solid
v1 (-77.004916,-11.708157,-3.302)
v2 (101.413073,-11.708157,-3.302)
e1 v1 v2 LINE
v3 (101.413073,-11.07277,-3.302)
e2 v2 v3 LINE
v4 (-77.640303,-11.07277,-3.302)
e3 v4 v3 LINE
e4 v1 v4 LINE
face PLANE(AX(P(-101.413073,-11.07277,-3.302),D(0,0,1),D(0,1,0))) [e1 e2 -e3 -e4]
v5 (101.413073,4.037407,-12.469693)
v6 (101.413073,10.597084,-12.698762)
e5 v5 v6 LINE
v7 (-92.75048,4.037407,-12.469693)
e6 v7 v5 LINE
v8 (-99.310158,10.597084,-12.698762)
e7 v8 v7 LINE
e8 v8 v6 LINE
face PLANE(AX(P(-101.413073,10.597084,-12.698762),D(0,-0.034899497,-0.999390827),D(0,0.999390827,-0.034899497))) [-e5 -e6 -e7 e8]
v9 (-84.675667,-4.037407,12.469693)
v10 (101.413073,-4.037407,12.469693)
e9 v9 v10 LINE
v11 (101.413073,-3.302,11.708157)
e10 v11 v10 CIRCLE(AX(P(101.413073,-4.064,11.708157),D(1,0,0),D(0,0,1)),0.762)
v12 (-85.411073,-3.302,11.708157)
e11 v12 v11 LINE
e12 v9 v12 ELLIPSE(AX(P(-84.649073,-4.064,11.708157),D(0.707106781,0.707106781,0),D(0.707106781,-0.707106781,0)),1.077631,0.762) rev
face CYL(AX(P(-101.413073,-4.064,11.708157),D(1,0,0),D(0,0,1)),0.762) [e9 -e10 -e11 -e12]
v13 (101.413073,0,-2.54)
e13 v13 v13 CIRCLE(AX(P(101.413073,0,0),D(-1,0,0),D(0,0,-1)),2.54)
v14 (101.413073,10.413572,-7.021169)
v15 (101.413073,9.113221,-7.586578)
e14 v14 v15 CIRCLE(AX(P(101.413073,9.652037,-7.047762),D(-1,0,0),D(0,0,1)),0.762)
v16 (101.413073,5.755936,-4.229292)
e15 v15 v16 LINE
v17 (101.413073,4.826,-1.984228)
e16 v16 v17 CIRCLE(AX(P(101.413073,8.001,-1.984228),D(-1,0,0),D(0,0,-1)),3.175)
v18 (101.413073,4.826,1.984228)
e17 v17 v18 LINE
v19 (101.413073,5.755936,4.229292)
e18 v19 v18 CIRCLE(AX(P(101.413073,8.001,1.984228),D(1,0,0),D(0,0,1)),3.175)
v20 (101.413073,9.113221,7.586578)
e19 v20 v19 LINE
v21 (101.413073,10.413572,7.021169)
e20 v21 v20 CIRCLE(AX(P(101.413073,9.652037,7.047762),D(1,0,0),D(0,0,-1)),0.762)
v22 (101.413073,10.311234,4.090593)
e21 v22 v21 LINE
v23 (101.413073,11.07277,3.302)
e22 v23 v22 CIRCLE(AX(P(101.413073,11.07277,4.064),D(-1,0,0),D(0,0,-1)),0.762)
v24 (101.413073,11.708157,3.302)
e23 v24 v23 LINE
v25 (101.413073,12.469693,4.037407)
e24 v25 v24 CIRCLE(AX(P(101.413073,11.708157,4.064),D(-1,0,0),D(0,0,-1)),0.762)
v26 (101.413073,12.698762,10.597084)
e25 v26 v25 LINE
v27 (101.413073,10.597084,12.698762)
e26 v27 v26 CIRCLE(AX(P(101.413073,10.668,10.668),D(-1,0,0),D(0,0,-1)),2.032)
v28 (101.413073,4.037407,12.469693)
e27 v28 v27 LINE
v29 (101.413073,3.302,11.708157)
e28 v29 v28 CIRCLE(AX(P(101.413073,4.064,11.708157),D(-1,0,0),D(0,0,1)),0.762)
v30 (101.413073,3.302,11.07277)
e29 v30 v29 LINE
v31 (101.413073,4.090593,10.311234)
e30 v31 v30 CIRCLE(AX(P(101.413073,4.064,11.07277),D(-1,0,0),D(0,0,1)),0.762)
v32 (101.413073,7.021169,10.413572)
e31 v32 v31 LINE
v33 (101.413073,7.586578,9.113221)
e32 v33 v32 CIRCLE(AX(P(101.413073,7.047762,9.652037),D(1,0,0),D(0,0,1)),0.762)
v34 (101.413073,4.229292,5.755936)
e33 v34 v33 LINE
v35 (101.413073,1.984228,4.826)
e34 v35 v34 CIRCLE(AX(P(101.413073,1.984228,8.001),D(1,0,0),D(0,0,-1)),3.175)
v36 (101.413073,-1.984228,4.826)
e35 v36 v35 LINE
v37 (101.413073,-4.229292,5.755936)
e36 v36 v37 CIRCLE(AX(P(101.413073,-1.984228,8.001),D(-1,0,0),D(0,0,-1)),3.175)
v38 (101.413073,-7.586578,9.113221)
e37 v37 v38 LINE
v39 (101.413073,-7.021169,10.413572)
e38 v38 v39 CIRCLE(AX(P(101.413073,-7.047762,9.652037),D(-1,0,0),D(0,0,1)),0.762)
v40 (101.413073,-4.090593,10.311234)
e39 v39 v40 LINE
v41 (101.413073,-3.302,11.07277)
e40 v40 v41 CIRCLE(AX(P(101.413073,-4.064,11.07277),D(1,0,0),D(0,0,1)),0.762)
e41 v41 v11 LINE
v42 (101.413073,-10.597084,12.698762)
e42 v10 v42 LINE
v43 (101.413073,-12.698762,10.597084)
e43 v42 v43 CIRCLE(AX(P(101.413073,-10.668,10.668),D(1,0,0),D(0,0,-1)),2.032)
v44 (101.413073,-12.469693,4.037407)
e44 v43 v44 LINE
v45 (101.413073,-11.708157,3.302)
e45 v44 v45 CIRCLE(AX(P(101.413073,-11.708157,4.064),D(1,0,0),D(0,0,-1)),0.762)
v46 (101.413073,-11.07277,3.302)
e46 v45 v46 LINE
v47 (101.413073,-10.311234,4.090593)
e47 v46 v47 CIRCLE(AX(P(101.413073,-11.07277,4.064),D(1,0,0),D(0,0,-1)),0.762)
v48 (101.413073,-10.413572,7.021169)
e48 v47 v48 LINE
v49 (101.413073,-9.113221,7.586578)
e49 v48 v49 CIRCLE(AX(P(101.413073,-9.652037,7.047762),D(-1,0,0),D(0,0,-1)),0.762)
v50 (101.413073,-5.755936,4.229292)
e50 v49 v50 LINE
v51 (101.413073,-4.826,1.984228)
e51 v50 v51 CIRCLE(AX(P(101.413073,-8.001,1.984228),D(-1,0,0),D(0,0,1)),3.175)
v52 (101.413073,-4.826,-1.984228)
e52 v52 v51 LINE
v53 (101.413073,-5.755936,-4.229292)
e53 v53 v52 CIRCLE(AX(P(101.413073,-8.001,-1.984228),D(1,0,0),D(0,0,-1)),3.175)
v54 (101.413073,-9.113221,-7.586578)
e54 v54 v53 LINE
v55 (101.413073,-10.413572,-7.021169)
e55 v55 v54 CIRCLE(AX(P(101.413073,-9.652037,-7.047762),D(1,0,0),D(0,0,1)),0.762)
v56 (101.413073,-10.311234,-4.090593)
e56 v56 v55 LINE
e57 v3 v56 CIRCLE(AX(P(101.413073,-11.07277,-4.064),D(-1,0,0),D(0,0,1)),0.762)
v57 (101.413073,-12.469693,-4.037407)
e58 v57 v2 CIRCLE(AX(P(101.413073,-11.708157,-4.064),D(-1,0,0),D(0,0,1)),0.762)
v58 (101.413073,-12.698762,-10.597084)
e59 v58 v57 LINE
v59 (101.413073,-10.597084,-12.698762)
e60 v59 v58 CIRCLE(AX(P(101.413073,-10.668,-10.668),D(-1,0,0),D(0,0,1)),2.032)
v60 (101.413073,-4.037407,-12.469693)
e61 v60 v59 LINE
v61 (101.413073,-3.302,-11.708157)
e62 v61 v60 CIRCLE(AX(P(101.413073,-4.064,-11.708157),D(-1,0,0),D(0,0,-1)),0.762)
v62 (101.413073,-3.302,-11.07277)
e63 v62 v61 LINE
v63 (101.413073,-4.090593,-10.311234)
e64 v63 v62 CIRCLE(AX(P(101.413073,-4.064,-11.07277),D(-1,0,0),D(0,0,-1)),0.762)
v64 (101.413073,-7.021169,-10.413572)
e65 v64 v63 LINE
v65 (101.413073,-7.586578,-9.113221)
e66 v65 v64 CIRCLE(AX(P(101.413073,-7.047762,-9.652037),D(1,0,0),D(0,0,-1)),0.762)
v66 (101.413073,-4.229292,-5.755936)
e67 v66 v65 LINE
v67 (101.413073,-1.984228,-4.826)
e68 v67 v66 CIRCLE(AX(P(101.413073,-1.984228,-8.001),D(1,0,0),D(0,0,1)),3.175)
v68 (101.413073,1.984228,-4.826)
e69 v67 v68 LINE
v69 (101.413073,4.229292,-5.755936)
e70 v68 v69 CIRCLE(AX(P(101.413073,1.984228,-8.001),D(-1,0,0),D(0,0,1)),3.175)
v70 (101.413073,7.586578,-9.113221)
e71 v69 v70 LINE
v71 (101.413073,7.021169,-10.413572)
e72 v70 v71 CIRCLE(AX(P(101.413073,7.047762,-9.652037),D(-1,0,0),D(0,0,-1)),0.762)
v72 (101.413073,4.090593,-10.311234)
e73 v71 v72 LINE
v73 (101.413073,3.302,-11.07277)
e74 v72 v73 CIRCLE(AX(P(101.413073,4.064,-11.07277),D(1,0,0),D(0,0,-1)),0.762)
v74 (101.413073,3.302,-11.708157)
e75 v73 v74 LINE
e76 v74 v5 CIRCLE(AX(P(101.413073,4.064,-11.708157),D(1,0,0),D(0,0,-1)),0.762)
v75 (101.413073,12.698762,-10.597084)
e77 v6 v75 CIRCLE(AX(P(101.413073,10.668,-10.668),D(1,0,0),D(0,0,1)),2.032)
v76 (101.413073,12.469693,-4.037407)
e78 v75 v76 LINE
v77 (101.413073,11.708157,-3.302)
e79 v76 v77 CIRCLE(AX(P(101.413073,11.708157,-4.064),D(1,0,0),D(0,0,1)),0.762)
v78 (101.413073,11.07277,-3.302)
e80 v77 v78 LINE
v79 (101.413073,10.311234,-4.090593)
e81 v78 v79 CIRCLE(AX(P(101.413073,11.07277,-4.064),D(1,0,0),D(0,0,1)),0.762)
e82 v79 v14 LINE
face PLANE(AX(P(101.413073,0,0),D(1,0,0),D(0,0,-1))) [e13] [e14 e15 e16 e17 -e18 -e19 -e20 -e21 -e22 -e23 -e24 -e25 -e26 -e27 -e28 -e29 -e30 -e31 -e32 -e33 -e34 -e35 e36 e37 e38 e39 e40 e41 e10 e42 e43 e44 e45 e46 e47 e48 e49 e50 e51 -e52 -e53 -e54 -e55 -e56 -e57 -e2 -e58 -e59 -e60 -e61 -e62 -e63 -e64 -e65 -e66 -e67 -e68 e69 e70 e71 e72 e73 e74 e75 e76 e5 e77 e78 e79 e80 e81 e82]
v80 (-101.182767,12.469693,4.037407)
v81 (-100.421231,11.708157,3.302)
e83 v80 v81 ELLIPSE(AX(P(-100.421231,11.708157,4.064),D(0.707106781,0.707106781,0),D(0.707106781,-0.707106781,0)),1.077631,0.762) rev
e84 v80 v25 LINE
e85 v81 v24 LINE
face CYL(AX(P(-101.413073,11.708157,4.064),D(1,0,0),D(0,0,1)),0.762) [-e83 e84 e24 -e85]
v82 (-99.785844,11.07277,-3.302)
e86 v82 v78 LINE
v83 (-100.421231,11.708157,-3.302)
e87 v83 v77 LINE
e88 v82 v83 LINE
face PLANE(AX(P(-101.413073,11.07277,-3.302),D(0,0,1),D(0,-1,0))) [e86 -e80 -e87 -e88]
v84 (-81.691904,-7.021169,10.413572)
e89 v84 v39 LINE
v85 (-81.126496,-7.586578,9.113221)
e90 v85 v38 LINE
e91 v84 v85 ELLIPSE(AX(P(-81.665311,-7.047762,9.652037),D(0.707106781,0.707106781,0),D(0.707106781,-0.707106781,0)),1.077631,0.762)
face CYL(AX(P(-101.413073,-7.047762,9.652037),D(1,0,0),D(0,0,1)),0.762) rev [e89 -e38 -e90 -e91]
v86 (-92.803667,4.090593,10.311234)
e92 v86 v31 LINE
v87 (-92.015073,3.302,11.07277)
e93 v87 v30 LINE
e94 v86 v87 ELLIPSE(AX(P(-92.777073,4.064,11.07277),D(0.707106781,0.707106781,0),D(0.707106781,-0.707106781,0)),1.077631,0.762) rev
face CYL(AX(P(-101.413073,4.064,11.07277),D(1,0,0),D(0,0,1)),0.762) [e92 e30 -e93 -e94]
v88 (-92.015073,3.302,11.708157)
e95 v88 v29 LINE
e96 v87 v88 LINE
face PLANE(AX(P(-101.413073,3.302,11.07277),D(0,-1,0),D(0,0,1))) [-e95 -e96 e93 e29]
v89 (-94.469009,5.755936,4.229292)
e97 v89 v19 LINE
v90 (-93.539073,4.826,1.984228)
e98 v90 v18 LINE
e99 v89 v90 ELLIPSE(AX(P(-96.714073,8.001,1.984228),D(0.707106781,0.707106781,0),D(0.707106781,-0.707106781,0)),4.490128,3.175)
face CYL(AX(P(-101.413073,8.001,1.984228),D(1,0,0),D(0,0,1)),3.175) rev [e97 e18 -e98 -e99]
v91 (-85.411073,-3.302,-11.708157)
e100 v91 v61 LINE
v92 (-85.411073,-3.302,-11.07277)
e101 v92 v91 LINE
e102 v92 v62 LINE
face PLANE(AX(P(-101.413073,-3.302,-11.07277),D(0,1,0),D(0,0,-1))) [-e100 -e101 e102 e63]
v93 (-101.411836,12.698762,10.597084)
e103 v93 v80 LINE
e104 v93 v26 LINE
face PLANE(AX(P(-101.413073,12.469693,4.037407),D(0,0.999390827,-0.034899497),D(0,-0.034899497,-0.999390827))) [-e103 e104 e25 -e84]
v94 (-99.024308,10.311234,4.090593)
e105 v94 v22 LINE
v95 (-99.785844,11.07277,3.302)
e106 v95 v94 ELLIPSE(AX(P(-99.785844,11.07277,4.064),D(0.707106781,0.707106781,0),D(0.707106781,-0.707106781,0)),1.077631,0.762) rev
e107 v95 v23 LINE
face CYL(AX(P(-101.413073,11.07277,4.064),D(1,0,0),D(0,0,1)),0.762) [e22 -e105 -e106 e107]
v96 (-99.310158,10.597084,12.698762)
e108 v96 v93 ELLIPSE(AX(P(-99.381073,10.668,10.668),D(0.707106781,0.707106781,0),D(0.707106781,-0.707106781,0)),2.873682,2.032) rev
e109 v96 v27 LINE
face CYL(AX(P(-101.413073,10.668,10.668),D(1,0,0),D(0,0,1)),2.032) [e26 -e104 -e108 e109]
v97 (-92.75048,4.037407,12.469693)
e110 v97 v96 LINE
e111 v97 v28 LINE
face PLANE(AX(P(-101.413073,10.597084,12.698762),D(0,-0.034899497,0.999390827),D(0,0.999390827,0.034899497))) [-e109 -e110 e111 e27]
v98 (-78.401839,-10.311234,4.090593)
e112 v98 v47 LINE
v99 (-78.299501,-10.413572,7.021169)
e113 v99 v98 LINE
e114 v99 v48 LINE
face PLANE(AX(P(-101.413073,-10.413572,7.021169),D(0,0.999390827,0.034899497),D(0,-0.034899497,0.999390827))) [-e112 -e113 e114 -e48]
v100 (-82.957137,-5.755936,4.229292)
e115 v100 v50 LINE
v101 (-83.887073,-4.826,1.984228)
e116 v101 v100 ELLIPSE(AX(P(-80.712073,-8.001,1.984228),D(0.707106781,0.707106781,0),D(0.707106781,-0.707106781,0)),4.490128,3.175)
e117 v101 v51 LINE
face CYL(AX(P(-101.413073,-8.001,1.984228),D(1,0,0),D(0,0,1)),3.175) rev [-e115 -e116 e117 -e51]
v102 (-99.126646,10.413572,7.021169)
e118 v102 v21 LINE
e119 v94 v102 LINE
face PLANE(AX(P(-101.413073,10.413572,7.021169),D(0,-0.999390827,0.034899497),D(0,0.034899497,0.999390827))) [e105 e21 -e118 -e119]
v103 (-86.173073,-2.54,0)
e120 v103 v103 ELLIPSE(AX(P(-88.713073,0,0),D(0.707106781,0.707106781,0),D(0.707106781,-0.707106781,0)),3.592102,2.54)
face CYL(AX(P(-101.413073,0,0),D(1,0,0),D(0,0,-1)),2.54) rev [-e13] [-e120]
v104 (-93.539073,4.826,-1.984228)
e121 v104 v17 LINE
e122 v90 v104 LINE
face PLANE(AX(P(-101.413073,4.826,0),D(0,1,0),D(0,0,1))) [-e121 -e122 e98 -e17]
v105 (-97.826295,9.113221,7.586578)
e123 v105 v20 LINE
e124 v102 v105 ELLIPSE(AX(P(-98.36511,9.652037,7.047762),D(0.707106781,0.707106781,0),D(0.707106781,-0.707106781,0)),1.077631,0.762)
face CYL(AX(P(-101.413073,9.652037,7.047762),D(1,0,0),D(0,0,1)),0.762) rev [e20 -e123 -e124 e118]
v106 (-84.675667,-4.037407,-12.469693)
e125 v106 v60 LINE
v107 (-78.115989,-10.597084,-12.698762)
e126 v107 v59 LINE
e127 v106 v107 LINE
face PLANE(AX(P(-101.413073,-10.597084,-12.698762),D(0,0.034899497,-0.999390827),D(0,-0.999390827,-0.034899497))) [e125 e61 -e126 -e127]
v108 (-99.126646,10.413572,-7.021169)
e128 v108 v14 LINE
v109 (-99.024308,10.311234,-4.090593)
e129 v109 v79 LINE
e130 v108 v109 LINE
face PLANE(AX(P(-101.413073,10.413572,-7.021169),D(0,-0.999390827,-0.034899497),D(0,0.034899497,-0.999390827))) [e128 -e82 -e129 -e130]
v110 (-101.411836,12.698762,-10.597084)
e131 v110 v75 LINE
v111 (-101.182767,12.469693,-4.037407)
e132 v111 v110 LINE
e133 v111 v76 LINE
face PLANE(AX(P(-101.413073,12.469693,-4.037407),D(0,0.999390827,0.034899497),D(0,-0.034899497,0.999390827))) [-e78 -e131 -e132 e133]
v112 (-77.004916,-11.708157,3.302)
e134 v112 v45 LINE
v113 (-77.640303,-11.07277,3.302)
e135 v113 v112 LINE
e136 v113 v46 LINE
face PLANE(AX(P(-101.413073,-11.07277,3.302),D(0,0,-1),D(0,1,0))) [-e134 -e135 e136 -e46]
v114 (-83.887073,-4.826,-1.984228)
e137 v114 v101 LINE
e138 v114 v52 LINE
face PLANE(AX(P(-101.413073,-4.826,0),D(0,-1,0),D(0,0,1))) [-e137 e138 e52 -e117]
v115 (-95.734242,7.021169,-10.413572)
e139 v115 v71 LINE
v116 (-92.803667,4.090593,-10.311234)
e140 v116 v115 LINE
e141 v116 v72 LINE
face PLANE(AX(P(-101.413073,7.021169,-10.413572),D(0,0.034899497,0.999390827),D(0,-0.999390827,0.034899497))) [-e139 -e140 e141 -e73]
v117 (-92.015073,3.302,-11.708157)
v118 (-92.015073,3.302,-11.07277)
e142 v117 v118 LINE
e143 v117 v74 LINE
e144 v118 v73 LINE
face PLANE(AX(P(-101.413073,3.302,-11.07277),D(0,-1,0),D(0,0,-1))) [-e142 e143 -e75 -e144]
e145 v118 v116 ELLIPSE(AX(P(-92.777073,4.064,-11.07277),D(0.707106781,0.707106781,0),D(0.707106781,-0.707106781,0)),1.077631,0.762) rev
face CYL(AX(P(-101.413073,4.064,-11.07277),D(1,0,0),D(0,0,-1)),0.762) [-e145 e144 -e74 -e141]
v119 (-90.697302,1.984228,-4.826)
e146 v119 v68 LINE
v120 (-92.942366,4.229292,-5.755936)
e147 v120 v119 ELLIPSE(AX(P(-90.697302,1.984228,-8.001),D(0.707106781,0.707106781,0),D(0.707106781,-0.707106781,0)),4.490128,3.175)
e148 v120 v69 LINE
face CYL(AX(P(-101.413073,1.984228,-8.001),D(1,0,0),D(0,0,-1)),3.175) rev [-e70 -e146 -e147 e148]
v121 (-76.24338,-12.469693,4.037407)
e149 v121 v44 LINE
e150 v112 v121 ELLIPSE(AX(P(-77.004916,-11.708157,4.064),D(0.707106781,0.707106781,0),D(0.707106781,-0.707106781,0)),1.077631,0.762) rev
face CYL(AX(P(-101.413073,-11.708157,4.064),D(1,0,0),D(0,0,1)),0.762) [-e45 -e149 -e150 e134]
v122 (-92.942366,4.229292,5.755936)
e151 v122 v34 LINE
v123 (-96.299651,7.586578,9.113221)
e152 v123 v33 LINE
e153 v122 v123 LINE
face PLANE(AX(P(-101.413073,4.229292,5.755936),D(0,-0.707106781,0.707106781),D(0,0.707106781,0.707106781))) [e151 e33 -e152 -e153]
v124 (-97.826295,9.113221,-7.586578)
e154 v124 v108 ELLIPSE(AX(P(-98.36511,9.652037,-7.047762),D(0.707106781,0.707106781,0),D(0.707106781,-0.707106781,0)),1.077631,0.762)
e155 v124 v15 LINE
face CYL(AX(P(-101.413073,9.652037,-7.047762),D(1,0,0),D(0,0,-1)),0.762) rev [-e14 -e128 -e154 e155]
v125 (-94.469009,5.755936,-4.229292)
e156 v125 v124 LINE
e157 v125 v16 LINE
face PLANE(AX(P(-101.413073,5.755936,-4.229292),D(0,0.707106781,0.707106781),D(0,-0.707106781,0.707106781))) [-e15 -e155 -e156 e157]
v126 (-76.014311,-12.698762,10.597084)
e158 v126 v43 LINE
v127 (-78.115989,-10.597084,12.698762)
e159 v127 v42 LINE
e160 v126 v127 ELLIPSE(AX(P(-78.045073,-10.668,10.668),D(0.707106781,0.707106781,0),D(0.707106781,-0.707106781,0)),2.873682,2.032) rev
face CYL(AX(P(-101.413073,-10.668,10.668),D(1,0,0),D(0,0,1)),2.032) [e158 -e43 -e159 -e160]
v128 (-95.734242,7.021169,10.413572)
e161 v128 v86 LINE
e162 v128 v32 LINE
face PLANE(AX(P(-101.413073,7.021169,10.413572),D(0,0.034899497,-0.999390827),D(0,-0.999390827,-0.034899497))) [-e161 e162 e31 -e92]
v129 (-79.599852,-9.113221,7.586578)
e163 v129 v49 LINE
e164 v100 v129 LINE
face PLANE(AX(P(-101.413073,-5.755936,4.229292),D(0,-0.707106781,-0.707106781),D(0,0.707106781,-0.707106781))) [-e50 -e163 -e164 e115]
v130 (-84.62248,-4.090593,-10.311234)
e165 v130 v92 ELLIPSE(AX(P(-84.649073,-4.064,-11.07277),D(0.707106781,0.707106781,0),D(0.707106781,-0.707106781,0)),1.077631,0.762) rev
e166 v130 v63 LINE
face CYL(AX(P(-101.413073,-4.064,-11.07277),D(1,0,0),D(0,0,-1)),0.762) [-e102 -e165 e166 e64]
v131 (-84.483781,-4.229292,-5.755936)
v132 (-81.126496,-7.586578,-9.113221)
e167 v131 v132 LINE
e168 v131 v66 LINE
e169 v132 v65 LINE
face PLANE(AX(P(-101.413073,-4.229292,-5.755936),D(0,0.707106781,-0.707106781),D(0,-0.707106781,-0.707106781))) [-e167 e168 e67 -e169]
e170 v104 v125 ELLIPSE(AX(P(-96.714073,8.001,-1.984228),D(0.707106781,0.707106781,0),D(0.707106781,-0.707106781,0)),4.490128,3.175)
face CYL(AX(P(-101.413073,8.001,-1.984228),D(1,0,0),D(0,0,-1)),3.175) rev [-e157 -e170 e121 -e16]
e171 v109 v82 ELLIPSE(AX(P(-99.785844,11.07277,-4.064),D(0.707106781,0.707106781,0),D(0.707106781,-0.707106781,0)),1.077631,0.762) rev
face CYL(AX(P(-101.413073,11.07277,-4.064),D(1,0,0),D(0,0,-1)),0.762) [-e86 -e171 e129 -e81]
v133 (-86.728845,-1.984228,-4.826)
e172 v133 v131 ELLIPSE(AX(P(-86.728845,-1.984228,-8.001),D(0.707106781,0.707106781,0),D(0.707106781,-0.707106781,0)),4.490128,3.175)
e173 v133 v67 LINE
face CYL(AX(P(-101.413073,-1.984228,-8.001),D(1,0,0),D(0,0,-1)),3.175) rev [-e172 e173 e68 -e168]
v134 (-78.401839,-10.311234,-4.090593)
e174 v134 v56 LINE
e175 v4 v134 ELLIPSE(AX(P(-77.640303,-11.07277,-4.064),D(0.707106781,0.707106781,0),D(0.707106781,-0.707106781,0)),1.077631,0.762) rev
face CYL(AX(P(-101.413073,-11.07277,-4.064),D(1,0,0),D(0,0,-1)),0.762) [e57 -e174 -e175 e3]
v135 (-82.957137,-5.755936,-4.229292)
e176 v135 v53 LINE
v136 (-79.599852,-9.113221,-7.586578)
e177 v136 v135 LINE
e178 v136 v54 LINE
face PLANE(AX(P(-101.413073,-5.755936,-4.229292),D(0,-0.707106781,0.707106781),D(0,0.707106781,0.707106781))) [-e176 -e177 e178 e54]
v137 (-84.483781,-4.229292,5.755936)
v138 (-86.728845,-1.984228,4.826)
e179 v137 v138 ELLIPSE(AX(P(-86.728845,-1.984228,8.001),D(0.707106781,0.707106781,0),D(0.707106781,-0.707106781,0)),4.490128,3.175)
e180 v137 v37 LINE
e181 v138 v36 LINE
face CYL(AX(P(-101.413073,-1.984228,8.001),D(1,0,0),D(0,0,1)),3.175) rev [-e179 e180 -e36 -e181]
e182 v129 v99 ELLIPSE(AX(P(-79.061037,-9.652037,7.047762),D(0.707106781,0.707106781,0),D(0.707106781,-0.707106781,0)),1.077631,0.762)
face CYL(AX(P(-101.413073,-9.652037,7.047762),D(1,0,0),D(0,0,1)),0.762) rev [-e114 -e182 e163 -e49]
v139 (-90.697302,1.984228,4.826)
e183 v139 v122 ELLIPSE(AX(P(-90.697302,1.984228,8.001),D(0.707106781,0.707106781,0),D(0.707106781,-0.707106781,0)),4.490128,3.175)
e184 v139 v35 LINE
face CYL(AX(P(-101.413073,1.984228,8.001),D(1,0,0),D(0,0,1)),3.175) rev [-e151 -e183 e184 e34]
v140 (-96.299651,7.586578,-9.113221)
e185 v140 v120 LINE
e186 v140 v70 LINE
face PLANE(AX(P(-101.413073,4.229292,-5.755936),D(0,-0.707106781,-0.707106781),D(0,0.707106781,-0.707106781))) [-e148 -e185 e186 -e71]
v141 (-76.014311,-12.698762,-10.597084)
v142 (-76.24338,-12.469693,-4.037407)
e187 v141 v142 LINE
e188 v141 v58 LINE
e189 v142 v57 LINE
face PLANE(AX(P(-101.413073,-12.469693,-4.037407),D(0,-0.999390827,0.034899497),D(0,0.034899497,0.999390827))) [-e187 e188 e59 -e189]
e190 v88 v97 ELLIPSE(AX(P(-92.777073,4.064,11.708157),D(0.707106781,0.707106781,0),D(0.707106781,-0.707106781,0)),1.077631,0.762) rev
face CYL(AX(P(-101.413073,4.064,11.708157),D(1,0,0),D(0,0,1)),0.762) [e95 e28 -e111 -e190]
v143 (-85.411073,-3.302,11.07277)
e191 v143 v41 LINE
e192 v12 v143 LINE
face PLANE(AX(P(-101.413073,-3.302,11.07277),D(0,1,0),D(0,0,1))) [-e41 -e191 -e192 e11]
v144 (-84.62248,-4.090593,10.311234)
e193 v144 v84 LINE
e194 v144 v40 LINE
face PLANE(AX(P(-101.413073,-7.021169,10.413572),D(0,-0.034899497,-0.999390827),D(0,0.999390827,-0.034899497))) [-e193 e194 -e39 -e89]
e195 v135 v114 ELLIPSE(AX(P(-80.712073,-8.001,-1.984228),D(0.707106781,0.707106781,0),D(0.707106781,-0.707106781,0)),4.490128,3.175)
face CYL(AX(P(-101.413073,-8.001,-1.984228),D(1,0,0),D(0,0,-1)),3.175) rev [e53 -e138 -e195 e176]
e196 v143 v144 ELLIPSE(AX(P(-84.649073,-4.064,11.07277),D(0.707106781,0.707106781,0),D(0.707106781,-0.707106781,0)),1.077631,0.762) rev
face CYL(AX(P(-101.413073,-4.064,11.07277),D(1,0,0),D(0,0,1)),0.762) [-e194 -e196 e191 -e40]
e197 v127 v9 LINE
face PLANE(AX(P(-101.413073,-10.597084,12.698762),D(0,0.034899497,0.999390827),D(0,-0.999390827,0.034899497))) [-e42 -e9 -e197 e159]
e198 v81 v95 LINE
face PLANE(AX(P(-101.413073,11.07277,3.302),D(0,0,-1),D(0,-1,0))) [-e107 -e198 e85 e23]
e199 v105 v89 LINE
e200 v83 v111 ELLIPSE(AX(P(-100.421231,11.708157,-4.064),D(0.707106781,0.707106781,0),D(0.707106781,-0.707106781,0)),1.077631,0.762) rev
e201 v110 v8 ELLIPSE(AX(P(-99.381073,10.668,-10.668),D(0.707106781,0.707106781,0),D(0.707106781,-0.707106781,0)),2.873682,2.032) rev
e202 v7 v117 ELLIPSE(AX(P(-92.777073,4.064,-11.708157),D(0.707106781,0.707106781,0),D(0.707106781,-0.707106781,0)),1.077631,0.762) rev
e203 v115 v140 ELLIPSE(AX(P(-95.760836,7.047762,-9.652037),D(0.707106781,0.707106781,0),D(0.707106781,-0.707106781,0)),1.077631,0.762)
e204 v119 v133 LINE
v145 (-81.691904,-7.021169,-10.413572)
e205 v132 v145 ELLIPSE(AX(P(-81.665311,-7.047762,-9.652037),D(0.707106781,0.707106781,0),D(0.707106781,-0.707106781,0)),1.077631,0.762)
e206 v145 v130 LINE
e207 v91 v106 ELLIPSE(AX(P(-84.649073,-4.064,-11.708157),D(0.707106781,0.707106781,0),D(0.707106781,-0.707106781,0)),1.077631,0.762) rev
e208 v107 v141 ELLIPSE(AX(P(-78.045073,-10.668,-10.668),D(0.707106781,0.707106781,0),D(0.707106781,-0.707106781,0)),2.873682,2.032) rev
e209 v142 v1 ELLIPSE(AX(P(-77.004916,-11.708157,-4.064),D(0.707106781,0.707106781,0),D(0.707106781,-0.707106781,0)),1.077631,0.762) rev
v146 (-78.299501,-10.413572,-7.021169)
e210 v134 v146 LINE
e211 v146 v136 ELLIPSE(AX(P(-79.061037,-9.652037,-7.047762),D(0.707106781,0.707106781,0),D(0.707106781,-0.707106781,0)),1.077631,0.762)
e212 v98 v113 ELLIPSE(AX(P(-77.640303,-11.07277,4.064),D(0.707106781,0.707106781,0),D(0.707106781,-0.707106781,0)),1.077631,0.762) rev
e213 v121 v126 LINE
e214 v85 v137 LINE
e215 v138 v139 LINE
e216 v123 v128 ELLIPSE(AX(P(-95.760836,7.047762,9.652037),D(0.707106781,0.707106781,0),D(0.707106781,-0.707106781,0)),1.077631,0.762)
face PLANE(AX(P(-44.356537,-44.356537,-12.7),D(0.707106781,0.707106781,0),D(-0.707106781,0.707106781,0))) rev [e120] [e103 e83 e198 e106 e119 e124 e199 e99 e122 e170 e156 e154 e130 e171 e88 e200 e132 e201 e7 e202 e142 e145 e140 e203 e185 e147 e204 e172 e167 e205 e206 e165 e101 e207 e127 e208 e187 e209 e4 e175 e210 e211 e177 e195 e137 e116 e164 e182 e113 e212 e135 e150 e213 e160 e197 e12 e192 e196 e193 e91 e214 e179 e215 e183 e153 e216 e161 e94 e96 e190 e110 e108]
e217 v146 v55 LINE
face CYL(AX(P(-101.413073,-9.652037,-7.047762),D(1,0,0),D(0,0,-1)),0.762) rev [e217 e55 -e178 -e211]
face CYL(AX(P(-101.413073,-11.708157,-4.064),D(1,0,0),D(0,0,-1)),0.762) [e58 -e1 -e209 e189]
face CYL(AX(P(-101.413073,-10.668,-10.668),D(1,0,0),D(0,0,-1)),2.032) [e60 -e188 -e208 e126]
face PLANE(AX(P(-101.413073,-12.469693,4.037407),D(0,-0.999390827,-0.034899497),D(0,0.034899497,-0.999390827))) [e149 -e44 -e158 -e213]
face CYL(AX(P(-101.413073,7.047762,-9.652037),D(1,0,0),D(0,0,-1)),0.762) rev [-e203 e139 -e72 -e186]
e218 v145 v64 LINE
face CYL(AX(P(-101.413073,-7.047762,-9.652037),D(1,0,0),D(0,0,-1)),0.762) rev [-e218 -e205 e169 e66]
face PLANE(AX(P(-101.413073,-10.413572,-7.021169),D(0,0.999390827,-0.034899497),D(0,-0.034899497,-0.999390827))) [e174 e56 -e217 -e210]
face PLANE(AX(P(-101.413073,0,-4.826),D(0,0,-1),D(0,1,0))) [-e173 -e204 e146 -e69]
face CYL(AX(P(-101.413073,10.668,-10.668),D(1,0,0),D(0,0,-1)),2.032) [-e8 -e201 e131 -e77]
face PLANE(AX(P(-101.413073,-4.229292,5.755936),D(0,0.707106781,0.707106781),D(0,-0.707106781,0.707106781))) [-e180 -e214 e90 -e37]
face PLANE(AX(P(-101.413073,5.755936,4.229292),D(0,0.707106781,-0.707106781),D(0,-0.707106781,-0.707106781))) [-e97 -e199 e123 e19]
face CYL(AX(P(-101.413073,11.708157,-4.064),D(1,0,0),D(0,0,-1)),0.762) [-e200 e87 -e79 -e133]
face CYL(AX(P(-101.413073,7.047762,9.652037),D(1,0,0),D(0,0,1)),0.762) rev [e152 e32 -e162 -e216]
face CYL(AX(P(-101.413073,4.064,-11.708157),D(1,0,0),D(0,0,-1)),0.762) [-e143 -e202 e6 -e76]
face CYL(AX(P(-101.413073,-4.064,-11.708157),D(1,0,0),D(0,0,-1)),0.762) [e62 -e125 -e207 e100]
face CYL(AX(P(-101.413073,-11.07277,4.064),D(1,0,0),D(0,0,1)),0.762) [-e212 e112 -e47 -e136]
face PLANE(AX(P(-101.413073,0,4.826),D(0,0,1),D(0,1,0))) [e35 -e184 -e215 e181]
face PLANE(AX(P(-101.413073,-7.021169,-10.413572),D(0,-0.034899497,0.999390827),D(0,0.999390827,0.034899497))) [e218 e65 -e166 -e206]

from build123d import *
from OCP.BRepAlgoAPI import BRepAlgoAPI_Cut
from OCP.TopTools import TopTools_ListOfShape

# Parameters (mm, degrees)
BOSS_EXTRUDE1_DEPTH      = 101.413073
BOSS_EXTRUDE1_DEPTH_BACK = 101.413073
CUT_EXTRUDE7_DEPTH       = 115.133874793


with BuildPart() as part:
    # Sketch3 → Boss-Extrude1 (new, two sides: drawn at the far end of the back side and taken through both)
    with BuildSketch(Plane(origin=(0, 0, 0), x_dir=(0, 0, -1), z_dir=(1, 0, 0)).offset(-BOSS_EXTRUDE1_DEPTH_BACK)):
        with BuildLine():
            Line((0, 4.826), (1.984228399, 4.826))
            ThreePointArc((1.984228399, 4.826), (3.199248297, 5.067682484), (4.229292429, 5.75593597))
            Line((4.229292429, 5.75593597), (7.586577723, 9.113221264))
            ThreePointArc((7.586577723, 9.113221264), (7.746562132, 9.955883421), (7.021168939, 10.413572441))
            Line((7.021168939, 10.413572441), (4.090593416, 10.311234489))
            ThreePointArc((4.090593416, 10.311234489), (3.534670322, 10.524633371), (3.302, 11.072770299))
            Line((3.302, 11.072770299), (3.302, 11.70815736))
            ThreePointArc((3.302, 11.70815736), (3.515863072, 12.237487038), (4.037406584, 12.46969317))
            Line((4.037406584, 12.46969317), (10.597084223, 12.698762161))
            ThreePointArc((10.597084223, 12.698762161), (12.104840979, 12.104840979), (12.698762161, 10.597084223))
            Line((12.698762161, 10.597084223), (12.46969317, 4.037406584))
            ThreePointArc((12.46969317, 4.037406584), (12.237487038, 3.515863072), (11.70815736, 3.302))
            Line((11.70815736, 3.302), (11.072770299, 3.302))
            ThreePointArc((11.072770299, 3.302), (10.524633371, 3.534670322), (10.311234489, 4.090593416))
            Line((10.311234489, 4.090593416), (10.413572441, 7.021168939))
            ThreePointArc((10.413572441, 7.021168939), (9.955883421, 7.746562132), (9.113221264, 7.586577723))
            Line((9.113221264, 7.586577723), (5.75593597, 4.229292429))
            ThreePointArc((5.75593597, 4.229292429), (5.067682484, 3.199248297), (4.826, 1.984228399))
            Line((4.826, 1.984228399), (4.826, 0))
            Line((4.826, 0), (2.54, 0))
            ThreePointArc((2.54, 0), (1.796051224, 1.796051224), (0, 2.54))
            Line((0, 2.54), (0, 4.826))
        make_face()
    extrude(amount=BOSS_EXTRUDE1_DEPTH + BOSS_EXTRUDE1_DEPTH_BACK)

    # Mirror1: part across plane


with BuildPart() as part_1:
    add(part.part)
    add(part.part.mirror(Plane.ZX))

    # Mirror2: part across plane


with BuildPart() as part_2:
    add(part_1.part)
    add(part_1.part.mirror(Plane.XY))


with BuildPart() as cut_extrude7_tool:
    # Sketch10 → Cut-Extrude7 (new, through all)
    with BuildSketch(Plane.XY.offset(38.1)):
        Polygon((-76.013073399, -12.7), (-101.413073399, 12.7), (-101.413073399, -12.7), align=None)
        Polygon((-76.013073399, -12.7), (-101.413073399, -12.7), (-101.413073399, 12.7), (-106.454619086, 17.741545687), (-105.960543128, -16.167906454), (-72.545166945, -16.167906454), align=None)
    extrude(amount=-CUT_EXTRUDE7_DEPTH)


with BuildPart() as part_3:
    add(part_2.part)

    # Cut-Extrude7: cut by cut_extrude7_tool, with a tolerance
    cut_extrude7_stock = TopTools_ListOfShape()
    cut_extrude7_stock.Append(part_3.part.wrapped)
    cut_extrude7_tools = TopTools_ListOfShape()
    cut_extrude7_tools.Append(cut_extrude7_tool.part.wrapped)
    cut_extrude7_cut = BRepAlgoAPI_Cut()
    cut_extrude7_cut.SetArguments(cut_extrude7_stock)
    cut_extrude7_cut.SetTools(cut_extrude7_tools)
    cut_extrude7_cut.SetFuzzyValue(0.00001)
    cut_extrude7_cut.Build()
    add(Compound.cast(cut_extrude7_cut.Shape()).solids(), mode=Mode.REPLACE)


solid = part_3.part
